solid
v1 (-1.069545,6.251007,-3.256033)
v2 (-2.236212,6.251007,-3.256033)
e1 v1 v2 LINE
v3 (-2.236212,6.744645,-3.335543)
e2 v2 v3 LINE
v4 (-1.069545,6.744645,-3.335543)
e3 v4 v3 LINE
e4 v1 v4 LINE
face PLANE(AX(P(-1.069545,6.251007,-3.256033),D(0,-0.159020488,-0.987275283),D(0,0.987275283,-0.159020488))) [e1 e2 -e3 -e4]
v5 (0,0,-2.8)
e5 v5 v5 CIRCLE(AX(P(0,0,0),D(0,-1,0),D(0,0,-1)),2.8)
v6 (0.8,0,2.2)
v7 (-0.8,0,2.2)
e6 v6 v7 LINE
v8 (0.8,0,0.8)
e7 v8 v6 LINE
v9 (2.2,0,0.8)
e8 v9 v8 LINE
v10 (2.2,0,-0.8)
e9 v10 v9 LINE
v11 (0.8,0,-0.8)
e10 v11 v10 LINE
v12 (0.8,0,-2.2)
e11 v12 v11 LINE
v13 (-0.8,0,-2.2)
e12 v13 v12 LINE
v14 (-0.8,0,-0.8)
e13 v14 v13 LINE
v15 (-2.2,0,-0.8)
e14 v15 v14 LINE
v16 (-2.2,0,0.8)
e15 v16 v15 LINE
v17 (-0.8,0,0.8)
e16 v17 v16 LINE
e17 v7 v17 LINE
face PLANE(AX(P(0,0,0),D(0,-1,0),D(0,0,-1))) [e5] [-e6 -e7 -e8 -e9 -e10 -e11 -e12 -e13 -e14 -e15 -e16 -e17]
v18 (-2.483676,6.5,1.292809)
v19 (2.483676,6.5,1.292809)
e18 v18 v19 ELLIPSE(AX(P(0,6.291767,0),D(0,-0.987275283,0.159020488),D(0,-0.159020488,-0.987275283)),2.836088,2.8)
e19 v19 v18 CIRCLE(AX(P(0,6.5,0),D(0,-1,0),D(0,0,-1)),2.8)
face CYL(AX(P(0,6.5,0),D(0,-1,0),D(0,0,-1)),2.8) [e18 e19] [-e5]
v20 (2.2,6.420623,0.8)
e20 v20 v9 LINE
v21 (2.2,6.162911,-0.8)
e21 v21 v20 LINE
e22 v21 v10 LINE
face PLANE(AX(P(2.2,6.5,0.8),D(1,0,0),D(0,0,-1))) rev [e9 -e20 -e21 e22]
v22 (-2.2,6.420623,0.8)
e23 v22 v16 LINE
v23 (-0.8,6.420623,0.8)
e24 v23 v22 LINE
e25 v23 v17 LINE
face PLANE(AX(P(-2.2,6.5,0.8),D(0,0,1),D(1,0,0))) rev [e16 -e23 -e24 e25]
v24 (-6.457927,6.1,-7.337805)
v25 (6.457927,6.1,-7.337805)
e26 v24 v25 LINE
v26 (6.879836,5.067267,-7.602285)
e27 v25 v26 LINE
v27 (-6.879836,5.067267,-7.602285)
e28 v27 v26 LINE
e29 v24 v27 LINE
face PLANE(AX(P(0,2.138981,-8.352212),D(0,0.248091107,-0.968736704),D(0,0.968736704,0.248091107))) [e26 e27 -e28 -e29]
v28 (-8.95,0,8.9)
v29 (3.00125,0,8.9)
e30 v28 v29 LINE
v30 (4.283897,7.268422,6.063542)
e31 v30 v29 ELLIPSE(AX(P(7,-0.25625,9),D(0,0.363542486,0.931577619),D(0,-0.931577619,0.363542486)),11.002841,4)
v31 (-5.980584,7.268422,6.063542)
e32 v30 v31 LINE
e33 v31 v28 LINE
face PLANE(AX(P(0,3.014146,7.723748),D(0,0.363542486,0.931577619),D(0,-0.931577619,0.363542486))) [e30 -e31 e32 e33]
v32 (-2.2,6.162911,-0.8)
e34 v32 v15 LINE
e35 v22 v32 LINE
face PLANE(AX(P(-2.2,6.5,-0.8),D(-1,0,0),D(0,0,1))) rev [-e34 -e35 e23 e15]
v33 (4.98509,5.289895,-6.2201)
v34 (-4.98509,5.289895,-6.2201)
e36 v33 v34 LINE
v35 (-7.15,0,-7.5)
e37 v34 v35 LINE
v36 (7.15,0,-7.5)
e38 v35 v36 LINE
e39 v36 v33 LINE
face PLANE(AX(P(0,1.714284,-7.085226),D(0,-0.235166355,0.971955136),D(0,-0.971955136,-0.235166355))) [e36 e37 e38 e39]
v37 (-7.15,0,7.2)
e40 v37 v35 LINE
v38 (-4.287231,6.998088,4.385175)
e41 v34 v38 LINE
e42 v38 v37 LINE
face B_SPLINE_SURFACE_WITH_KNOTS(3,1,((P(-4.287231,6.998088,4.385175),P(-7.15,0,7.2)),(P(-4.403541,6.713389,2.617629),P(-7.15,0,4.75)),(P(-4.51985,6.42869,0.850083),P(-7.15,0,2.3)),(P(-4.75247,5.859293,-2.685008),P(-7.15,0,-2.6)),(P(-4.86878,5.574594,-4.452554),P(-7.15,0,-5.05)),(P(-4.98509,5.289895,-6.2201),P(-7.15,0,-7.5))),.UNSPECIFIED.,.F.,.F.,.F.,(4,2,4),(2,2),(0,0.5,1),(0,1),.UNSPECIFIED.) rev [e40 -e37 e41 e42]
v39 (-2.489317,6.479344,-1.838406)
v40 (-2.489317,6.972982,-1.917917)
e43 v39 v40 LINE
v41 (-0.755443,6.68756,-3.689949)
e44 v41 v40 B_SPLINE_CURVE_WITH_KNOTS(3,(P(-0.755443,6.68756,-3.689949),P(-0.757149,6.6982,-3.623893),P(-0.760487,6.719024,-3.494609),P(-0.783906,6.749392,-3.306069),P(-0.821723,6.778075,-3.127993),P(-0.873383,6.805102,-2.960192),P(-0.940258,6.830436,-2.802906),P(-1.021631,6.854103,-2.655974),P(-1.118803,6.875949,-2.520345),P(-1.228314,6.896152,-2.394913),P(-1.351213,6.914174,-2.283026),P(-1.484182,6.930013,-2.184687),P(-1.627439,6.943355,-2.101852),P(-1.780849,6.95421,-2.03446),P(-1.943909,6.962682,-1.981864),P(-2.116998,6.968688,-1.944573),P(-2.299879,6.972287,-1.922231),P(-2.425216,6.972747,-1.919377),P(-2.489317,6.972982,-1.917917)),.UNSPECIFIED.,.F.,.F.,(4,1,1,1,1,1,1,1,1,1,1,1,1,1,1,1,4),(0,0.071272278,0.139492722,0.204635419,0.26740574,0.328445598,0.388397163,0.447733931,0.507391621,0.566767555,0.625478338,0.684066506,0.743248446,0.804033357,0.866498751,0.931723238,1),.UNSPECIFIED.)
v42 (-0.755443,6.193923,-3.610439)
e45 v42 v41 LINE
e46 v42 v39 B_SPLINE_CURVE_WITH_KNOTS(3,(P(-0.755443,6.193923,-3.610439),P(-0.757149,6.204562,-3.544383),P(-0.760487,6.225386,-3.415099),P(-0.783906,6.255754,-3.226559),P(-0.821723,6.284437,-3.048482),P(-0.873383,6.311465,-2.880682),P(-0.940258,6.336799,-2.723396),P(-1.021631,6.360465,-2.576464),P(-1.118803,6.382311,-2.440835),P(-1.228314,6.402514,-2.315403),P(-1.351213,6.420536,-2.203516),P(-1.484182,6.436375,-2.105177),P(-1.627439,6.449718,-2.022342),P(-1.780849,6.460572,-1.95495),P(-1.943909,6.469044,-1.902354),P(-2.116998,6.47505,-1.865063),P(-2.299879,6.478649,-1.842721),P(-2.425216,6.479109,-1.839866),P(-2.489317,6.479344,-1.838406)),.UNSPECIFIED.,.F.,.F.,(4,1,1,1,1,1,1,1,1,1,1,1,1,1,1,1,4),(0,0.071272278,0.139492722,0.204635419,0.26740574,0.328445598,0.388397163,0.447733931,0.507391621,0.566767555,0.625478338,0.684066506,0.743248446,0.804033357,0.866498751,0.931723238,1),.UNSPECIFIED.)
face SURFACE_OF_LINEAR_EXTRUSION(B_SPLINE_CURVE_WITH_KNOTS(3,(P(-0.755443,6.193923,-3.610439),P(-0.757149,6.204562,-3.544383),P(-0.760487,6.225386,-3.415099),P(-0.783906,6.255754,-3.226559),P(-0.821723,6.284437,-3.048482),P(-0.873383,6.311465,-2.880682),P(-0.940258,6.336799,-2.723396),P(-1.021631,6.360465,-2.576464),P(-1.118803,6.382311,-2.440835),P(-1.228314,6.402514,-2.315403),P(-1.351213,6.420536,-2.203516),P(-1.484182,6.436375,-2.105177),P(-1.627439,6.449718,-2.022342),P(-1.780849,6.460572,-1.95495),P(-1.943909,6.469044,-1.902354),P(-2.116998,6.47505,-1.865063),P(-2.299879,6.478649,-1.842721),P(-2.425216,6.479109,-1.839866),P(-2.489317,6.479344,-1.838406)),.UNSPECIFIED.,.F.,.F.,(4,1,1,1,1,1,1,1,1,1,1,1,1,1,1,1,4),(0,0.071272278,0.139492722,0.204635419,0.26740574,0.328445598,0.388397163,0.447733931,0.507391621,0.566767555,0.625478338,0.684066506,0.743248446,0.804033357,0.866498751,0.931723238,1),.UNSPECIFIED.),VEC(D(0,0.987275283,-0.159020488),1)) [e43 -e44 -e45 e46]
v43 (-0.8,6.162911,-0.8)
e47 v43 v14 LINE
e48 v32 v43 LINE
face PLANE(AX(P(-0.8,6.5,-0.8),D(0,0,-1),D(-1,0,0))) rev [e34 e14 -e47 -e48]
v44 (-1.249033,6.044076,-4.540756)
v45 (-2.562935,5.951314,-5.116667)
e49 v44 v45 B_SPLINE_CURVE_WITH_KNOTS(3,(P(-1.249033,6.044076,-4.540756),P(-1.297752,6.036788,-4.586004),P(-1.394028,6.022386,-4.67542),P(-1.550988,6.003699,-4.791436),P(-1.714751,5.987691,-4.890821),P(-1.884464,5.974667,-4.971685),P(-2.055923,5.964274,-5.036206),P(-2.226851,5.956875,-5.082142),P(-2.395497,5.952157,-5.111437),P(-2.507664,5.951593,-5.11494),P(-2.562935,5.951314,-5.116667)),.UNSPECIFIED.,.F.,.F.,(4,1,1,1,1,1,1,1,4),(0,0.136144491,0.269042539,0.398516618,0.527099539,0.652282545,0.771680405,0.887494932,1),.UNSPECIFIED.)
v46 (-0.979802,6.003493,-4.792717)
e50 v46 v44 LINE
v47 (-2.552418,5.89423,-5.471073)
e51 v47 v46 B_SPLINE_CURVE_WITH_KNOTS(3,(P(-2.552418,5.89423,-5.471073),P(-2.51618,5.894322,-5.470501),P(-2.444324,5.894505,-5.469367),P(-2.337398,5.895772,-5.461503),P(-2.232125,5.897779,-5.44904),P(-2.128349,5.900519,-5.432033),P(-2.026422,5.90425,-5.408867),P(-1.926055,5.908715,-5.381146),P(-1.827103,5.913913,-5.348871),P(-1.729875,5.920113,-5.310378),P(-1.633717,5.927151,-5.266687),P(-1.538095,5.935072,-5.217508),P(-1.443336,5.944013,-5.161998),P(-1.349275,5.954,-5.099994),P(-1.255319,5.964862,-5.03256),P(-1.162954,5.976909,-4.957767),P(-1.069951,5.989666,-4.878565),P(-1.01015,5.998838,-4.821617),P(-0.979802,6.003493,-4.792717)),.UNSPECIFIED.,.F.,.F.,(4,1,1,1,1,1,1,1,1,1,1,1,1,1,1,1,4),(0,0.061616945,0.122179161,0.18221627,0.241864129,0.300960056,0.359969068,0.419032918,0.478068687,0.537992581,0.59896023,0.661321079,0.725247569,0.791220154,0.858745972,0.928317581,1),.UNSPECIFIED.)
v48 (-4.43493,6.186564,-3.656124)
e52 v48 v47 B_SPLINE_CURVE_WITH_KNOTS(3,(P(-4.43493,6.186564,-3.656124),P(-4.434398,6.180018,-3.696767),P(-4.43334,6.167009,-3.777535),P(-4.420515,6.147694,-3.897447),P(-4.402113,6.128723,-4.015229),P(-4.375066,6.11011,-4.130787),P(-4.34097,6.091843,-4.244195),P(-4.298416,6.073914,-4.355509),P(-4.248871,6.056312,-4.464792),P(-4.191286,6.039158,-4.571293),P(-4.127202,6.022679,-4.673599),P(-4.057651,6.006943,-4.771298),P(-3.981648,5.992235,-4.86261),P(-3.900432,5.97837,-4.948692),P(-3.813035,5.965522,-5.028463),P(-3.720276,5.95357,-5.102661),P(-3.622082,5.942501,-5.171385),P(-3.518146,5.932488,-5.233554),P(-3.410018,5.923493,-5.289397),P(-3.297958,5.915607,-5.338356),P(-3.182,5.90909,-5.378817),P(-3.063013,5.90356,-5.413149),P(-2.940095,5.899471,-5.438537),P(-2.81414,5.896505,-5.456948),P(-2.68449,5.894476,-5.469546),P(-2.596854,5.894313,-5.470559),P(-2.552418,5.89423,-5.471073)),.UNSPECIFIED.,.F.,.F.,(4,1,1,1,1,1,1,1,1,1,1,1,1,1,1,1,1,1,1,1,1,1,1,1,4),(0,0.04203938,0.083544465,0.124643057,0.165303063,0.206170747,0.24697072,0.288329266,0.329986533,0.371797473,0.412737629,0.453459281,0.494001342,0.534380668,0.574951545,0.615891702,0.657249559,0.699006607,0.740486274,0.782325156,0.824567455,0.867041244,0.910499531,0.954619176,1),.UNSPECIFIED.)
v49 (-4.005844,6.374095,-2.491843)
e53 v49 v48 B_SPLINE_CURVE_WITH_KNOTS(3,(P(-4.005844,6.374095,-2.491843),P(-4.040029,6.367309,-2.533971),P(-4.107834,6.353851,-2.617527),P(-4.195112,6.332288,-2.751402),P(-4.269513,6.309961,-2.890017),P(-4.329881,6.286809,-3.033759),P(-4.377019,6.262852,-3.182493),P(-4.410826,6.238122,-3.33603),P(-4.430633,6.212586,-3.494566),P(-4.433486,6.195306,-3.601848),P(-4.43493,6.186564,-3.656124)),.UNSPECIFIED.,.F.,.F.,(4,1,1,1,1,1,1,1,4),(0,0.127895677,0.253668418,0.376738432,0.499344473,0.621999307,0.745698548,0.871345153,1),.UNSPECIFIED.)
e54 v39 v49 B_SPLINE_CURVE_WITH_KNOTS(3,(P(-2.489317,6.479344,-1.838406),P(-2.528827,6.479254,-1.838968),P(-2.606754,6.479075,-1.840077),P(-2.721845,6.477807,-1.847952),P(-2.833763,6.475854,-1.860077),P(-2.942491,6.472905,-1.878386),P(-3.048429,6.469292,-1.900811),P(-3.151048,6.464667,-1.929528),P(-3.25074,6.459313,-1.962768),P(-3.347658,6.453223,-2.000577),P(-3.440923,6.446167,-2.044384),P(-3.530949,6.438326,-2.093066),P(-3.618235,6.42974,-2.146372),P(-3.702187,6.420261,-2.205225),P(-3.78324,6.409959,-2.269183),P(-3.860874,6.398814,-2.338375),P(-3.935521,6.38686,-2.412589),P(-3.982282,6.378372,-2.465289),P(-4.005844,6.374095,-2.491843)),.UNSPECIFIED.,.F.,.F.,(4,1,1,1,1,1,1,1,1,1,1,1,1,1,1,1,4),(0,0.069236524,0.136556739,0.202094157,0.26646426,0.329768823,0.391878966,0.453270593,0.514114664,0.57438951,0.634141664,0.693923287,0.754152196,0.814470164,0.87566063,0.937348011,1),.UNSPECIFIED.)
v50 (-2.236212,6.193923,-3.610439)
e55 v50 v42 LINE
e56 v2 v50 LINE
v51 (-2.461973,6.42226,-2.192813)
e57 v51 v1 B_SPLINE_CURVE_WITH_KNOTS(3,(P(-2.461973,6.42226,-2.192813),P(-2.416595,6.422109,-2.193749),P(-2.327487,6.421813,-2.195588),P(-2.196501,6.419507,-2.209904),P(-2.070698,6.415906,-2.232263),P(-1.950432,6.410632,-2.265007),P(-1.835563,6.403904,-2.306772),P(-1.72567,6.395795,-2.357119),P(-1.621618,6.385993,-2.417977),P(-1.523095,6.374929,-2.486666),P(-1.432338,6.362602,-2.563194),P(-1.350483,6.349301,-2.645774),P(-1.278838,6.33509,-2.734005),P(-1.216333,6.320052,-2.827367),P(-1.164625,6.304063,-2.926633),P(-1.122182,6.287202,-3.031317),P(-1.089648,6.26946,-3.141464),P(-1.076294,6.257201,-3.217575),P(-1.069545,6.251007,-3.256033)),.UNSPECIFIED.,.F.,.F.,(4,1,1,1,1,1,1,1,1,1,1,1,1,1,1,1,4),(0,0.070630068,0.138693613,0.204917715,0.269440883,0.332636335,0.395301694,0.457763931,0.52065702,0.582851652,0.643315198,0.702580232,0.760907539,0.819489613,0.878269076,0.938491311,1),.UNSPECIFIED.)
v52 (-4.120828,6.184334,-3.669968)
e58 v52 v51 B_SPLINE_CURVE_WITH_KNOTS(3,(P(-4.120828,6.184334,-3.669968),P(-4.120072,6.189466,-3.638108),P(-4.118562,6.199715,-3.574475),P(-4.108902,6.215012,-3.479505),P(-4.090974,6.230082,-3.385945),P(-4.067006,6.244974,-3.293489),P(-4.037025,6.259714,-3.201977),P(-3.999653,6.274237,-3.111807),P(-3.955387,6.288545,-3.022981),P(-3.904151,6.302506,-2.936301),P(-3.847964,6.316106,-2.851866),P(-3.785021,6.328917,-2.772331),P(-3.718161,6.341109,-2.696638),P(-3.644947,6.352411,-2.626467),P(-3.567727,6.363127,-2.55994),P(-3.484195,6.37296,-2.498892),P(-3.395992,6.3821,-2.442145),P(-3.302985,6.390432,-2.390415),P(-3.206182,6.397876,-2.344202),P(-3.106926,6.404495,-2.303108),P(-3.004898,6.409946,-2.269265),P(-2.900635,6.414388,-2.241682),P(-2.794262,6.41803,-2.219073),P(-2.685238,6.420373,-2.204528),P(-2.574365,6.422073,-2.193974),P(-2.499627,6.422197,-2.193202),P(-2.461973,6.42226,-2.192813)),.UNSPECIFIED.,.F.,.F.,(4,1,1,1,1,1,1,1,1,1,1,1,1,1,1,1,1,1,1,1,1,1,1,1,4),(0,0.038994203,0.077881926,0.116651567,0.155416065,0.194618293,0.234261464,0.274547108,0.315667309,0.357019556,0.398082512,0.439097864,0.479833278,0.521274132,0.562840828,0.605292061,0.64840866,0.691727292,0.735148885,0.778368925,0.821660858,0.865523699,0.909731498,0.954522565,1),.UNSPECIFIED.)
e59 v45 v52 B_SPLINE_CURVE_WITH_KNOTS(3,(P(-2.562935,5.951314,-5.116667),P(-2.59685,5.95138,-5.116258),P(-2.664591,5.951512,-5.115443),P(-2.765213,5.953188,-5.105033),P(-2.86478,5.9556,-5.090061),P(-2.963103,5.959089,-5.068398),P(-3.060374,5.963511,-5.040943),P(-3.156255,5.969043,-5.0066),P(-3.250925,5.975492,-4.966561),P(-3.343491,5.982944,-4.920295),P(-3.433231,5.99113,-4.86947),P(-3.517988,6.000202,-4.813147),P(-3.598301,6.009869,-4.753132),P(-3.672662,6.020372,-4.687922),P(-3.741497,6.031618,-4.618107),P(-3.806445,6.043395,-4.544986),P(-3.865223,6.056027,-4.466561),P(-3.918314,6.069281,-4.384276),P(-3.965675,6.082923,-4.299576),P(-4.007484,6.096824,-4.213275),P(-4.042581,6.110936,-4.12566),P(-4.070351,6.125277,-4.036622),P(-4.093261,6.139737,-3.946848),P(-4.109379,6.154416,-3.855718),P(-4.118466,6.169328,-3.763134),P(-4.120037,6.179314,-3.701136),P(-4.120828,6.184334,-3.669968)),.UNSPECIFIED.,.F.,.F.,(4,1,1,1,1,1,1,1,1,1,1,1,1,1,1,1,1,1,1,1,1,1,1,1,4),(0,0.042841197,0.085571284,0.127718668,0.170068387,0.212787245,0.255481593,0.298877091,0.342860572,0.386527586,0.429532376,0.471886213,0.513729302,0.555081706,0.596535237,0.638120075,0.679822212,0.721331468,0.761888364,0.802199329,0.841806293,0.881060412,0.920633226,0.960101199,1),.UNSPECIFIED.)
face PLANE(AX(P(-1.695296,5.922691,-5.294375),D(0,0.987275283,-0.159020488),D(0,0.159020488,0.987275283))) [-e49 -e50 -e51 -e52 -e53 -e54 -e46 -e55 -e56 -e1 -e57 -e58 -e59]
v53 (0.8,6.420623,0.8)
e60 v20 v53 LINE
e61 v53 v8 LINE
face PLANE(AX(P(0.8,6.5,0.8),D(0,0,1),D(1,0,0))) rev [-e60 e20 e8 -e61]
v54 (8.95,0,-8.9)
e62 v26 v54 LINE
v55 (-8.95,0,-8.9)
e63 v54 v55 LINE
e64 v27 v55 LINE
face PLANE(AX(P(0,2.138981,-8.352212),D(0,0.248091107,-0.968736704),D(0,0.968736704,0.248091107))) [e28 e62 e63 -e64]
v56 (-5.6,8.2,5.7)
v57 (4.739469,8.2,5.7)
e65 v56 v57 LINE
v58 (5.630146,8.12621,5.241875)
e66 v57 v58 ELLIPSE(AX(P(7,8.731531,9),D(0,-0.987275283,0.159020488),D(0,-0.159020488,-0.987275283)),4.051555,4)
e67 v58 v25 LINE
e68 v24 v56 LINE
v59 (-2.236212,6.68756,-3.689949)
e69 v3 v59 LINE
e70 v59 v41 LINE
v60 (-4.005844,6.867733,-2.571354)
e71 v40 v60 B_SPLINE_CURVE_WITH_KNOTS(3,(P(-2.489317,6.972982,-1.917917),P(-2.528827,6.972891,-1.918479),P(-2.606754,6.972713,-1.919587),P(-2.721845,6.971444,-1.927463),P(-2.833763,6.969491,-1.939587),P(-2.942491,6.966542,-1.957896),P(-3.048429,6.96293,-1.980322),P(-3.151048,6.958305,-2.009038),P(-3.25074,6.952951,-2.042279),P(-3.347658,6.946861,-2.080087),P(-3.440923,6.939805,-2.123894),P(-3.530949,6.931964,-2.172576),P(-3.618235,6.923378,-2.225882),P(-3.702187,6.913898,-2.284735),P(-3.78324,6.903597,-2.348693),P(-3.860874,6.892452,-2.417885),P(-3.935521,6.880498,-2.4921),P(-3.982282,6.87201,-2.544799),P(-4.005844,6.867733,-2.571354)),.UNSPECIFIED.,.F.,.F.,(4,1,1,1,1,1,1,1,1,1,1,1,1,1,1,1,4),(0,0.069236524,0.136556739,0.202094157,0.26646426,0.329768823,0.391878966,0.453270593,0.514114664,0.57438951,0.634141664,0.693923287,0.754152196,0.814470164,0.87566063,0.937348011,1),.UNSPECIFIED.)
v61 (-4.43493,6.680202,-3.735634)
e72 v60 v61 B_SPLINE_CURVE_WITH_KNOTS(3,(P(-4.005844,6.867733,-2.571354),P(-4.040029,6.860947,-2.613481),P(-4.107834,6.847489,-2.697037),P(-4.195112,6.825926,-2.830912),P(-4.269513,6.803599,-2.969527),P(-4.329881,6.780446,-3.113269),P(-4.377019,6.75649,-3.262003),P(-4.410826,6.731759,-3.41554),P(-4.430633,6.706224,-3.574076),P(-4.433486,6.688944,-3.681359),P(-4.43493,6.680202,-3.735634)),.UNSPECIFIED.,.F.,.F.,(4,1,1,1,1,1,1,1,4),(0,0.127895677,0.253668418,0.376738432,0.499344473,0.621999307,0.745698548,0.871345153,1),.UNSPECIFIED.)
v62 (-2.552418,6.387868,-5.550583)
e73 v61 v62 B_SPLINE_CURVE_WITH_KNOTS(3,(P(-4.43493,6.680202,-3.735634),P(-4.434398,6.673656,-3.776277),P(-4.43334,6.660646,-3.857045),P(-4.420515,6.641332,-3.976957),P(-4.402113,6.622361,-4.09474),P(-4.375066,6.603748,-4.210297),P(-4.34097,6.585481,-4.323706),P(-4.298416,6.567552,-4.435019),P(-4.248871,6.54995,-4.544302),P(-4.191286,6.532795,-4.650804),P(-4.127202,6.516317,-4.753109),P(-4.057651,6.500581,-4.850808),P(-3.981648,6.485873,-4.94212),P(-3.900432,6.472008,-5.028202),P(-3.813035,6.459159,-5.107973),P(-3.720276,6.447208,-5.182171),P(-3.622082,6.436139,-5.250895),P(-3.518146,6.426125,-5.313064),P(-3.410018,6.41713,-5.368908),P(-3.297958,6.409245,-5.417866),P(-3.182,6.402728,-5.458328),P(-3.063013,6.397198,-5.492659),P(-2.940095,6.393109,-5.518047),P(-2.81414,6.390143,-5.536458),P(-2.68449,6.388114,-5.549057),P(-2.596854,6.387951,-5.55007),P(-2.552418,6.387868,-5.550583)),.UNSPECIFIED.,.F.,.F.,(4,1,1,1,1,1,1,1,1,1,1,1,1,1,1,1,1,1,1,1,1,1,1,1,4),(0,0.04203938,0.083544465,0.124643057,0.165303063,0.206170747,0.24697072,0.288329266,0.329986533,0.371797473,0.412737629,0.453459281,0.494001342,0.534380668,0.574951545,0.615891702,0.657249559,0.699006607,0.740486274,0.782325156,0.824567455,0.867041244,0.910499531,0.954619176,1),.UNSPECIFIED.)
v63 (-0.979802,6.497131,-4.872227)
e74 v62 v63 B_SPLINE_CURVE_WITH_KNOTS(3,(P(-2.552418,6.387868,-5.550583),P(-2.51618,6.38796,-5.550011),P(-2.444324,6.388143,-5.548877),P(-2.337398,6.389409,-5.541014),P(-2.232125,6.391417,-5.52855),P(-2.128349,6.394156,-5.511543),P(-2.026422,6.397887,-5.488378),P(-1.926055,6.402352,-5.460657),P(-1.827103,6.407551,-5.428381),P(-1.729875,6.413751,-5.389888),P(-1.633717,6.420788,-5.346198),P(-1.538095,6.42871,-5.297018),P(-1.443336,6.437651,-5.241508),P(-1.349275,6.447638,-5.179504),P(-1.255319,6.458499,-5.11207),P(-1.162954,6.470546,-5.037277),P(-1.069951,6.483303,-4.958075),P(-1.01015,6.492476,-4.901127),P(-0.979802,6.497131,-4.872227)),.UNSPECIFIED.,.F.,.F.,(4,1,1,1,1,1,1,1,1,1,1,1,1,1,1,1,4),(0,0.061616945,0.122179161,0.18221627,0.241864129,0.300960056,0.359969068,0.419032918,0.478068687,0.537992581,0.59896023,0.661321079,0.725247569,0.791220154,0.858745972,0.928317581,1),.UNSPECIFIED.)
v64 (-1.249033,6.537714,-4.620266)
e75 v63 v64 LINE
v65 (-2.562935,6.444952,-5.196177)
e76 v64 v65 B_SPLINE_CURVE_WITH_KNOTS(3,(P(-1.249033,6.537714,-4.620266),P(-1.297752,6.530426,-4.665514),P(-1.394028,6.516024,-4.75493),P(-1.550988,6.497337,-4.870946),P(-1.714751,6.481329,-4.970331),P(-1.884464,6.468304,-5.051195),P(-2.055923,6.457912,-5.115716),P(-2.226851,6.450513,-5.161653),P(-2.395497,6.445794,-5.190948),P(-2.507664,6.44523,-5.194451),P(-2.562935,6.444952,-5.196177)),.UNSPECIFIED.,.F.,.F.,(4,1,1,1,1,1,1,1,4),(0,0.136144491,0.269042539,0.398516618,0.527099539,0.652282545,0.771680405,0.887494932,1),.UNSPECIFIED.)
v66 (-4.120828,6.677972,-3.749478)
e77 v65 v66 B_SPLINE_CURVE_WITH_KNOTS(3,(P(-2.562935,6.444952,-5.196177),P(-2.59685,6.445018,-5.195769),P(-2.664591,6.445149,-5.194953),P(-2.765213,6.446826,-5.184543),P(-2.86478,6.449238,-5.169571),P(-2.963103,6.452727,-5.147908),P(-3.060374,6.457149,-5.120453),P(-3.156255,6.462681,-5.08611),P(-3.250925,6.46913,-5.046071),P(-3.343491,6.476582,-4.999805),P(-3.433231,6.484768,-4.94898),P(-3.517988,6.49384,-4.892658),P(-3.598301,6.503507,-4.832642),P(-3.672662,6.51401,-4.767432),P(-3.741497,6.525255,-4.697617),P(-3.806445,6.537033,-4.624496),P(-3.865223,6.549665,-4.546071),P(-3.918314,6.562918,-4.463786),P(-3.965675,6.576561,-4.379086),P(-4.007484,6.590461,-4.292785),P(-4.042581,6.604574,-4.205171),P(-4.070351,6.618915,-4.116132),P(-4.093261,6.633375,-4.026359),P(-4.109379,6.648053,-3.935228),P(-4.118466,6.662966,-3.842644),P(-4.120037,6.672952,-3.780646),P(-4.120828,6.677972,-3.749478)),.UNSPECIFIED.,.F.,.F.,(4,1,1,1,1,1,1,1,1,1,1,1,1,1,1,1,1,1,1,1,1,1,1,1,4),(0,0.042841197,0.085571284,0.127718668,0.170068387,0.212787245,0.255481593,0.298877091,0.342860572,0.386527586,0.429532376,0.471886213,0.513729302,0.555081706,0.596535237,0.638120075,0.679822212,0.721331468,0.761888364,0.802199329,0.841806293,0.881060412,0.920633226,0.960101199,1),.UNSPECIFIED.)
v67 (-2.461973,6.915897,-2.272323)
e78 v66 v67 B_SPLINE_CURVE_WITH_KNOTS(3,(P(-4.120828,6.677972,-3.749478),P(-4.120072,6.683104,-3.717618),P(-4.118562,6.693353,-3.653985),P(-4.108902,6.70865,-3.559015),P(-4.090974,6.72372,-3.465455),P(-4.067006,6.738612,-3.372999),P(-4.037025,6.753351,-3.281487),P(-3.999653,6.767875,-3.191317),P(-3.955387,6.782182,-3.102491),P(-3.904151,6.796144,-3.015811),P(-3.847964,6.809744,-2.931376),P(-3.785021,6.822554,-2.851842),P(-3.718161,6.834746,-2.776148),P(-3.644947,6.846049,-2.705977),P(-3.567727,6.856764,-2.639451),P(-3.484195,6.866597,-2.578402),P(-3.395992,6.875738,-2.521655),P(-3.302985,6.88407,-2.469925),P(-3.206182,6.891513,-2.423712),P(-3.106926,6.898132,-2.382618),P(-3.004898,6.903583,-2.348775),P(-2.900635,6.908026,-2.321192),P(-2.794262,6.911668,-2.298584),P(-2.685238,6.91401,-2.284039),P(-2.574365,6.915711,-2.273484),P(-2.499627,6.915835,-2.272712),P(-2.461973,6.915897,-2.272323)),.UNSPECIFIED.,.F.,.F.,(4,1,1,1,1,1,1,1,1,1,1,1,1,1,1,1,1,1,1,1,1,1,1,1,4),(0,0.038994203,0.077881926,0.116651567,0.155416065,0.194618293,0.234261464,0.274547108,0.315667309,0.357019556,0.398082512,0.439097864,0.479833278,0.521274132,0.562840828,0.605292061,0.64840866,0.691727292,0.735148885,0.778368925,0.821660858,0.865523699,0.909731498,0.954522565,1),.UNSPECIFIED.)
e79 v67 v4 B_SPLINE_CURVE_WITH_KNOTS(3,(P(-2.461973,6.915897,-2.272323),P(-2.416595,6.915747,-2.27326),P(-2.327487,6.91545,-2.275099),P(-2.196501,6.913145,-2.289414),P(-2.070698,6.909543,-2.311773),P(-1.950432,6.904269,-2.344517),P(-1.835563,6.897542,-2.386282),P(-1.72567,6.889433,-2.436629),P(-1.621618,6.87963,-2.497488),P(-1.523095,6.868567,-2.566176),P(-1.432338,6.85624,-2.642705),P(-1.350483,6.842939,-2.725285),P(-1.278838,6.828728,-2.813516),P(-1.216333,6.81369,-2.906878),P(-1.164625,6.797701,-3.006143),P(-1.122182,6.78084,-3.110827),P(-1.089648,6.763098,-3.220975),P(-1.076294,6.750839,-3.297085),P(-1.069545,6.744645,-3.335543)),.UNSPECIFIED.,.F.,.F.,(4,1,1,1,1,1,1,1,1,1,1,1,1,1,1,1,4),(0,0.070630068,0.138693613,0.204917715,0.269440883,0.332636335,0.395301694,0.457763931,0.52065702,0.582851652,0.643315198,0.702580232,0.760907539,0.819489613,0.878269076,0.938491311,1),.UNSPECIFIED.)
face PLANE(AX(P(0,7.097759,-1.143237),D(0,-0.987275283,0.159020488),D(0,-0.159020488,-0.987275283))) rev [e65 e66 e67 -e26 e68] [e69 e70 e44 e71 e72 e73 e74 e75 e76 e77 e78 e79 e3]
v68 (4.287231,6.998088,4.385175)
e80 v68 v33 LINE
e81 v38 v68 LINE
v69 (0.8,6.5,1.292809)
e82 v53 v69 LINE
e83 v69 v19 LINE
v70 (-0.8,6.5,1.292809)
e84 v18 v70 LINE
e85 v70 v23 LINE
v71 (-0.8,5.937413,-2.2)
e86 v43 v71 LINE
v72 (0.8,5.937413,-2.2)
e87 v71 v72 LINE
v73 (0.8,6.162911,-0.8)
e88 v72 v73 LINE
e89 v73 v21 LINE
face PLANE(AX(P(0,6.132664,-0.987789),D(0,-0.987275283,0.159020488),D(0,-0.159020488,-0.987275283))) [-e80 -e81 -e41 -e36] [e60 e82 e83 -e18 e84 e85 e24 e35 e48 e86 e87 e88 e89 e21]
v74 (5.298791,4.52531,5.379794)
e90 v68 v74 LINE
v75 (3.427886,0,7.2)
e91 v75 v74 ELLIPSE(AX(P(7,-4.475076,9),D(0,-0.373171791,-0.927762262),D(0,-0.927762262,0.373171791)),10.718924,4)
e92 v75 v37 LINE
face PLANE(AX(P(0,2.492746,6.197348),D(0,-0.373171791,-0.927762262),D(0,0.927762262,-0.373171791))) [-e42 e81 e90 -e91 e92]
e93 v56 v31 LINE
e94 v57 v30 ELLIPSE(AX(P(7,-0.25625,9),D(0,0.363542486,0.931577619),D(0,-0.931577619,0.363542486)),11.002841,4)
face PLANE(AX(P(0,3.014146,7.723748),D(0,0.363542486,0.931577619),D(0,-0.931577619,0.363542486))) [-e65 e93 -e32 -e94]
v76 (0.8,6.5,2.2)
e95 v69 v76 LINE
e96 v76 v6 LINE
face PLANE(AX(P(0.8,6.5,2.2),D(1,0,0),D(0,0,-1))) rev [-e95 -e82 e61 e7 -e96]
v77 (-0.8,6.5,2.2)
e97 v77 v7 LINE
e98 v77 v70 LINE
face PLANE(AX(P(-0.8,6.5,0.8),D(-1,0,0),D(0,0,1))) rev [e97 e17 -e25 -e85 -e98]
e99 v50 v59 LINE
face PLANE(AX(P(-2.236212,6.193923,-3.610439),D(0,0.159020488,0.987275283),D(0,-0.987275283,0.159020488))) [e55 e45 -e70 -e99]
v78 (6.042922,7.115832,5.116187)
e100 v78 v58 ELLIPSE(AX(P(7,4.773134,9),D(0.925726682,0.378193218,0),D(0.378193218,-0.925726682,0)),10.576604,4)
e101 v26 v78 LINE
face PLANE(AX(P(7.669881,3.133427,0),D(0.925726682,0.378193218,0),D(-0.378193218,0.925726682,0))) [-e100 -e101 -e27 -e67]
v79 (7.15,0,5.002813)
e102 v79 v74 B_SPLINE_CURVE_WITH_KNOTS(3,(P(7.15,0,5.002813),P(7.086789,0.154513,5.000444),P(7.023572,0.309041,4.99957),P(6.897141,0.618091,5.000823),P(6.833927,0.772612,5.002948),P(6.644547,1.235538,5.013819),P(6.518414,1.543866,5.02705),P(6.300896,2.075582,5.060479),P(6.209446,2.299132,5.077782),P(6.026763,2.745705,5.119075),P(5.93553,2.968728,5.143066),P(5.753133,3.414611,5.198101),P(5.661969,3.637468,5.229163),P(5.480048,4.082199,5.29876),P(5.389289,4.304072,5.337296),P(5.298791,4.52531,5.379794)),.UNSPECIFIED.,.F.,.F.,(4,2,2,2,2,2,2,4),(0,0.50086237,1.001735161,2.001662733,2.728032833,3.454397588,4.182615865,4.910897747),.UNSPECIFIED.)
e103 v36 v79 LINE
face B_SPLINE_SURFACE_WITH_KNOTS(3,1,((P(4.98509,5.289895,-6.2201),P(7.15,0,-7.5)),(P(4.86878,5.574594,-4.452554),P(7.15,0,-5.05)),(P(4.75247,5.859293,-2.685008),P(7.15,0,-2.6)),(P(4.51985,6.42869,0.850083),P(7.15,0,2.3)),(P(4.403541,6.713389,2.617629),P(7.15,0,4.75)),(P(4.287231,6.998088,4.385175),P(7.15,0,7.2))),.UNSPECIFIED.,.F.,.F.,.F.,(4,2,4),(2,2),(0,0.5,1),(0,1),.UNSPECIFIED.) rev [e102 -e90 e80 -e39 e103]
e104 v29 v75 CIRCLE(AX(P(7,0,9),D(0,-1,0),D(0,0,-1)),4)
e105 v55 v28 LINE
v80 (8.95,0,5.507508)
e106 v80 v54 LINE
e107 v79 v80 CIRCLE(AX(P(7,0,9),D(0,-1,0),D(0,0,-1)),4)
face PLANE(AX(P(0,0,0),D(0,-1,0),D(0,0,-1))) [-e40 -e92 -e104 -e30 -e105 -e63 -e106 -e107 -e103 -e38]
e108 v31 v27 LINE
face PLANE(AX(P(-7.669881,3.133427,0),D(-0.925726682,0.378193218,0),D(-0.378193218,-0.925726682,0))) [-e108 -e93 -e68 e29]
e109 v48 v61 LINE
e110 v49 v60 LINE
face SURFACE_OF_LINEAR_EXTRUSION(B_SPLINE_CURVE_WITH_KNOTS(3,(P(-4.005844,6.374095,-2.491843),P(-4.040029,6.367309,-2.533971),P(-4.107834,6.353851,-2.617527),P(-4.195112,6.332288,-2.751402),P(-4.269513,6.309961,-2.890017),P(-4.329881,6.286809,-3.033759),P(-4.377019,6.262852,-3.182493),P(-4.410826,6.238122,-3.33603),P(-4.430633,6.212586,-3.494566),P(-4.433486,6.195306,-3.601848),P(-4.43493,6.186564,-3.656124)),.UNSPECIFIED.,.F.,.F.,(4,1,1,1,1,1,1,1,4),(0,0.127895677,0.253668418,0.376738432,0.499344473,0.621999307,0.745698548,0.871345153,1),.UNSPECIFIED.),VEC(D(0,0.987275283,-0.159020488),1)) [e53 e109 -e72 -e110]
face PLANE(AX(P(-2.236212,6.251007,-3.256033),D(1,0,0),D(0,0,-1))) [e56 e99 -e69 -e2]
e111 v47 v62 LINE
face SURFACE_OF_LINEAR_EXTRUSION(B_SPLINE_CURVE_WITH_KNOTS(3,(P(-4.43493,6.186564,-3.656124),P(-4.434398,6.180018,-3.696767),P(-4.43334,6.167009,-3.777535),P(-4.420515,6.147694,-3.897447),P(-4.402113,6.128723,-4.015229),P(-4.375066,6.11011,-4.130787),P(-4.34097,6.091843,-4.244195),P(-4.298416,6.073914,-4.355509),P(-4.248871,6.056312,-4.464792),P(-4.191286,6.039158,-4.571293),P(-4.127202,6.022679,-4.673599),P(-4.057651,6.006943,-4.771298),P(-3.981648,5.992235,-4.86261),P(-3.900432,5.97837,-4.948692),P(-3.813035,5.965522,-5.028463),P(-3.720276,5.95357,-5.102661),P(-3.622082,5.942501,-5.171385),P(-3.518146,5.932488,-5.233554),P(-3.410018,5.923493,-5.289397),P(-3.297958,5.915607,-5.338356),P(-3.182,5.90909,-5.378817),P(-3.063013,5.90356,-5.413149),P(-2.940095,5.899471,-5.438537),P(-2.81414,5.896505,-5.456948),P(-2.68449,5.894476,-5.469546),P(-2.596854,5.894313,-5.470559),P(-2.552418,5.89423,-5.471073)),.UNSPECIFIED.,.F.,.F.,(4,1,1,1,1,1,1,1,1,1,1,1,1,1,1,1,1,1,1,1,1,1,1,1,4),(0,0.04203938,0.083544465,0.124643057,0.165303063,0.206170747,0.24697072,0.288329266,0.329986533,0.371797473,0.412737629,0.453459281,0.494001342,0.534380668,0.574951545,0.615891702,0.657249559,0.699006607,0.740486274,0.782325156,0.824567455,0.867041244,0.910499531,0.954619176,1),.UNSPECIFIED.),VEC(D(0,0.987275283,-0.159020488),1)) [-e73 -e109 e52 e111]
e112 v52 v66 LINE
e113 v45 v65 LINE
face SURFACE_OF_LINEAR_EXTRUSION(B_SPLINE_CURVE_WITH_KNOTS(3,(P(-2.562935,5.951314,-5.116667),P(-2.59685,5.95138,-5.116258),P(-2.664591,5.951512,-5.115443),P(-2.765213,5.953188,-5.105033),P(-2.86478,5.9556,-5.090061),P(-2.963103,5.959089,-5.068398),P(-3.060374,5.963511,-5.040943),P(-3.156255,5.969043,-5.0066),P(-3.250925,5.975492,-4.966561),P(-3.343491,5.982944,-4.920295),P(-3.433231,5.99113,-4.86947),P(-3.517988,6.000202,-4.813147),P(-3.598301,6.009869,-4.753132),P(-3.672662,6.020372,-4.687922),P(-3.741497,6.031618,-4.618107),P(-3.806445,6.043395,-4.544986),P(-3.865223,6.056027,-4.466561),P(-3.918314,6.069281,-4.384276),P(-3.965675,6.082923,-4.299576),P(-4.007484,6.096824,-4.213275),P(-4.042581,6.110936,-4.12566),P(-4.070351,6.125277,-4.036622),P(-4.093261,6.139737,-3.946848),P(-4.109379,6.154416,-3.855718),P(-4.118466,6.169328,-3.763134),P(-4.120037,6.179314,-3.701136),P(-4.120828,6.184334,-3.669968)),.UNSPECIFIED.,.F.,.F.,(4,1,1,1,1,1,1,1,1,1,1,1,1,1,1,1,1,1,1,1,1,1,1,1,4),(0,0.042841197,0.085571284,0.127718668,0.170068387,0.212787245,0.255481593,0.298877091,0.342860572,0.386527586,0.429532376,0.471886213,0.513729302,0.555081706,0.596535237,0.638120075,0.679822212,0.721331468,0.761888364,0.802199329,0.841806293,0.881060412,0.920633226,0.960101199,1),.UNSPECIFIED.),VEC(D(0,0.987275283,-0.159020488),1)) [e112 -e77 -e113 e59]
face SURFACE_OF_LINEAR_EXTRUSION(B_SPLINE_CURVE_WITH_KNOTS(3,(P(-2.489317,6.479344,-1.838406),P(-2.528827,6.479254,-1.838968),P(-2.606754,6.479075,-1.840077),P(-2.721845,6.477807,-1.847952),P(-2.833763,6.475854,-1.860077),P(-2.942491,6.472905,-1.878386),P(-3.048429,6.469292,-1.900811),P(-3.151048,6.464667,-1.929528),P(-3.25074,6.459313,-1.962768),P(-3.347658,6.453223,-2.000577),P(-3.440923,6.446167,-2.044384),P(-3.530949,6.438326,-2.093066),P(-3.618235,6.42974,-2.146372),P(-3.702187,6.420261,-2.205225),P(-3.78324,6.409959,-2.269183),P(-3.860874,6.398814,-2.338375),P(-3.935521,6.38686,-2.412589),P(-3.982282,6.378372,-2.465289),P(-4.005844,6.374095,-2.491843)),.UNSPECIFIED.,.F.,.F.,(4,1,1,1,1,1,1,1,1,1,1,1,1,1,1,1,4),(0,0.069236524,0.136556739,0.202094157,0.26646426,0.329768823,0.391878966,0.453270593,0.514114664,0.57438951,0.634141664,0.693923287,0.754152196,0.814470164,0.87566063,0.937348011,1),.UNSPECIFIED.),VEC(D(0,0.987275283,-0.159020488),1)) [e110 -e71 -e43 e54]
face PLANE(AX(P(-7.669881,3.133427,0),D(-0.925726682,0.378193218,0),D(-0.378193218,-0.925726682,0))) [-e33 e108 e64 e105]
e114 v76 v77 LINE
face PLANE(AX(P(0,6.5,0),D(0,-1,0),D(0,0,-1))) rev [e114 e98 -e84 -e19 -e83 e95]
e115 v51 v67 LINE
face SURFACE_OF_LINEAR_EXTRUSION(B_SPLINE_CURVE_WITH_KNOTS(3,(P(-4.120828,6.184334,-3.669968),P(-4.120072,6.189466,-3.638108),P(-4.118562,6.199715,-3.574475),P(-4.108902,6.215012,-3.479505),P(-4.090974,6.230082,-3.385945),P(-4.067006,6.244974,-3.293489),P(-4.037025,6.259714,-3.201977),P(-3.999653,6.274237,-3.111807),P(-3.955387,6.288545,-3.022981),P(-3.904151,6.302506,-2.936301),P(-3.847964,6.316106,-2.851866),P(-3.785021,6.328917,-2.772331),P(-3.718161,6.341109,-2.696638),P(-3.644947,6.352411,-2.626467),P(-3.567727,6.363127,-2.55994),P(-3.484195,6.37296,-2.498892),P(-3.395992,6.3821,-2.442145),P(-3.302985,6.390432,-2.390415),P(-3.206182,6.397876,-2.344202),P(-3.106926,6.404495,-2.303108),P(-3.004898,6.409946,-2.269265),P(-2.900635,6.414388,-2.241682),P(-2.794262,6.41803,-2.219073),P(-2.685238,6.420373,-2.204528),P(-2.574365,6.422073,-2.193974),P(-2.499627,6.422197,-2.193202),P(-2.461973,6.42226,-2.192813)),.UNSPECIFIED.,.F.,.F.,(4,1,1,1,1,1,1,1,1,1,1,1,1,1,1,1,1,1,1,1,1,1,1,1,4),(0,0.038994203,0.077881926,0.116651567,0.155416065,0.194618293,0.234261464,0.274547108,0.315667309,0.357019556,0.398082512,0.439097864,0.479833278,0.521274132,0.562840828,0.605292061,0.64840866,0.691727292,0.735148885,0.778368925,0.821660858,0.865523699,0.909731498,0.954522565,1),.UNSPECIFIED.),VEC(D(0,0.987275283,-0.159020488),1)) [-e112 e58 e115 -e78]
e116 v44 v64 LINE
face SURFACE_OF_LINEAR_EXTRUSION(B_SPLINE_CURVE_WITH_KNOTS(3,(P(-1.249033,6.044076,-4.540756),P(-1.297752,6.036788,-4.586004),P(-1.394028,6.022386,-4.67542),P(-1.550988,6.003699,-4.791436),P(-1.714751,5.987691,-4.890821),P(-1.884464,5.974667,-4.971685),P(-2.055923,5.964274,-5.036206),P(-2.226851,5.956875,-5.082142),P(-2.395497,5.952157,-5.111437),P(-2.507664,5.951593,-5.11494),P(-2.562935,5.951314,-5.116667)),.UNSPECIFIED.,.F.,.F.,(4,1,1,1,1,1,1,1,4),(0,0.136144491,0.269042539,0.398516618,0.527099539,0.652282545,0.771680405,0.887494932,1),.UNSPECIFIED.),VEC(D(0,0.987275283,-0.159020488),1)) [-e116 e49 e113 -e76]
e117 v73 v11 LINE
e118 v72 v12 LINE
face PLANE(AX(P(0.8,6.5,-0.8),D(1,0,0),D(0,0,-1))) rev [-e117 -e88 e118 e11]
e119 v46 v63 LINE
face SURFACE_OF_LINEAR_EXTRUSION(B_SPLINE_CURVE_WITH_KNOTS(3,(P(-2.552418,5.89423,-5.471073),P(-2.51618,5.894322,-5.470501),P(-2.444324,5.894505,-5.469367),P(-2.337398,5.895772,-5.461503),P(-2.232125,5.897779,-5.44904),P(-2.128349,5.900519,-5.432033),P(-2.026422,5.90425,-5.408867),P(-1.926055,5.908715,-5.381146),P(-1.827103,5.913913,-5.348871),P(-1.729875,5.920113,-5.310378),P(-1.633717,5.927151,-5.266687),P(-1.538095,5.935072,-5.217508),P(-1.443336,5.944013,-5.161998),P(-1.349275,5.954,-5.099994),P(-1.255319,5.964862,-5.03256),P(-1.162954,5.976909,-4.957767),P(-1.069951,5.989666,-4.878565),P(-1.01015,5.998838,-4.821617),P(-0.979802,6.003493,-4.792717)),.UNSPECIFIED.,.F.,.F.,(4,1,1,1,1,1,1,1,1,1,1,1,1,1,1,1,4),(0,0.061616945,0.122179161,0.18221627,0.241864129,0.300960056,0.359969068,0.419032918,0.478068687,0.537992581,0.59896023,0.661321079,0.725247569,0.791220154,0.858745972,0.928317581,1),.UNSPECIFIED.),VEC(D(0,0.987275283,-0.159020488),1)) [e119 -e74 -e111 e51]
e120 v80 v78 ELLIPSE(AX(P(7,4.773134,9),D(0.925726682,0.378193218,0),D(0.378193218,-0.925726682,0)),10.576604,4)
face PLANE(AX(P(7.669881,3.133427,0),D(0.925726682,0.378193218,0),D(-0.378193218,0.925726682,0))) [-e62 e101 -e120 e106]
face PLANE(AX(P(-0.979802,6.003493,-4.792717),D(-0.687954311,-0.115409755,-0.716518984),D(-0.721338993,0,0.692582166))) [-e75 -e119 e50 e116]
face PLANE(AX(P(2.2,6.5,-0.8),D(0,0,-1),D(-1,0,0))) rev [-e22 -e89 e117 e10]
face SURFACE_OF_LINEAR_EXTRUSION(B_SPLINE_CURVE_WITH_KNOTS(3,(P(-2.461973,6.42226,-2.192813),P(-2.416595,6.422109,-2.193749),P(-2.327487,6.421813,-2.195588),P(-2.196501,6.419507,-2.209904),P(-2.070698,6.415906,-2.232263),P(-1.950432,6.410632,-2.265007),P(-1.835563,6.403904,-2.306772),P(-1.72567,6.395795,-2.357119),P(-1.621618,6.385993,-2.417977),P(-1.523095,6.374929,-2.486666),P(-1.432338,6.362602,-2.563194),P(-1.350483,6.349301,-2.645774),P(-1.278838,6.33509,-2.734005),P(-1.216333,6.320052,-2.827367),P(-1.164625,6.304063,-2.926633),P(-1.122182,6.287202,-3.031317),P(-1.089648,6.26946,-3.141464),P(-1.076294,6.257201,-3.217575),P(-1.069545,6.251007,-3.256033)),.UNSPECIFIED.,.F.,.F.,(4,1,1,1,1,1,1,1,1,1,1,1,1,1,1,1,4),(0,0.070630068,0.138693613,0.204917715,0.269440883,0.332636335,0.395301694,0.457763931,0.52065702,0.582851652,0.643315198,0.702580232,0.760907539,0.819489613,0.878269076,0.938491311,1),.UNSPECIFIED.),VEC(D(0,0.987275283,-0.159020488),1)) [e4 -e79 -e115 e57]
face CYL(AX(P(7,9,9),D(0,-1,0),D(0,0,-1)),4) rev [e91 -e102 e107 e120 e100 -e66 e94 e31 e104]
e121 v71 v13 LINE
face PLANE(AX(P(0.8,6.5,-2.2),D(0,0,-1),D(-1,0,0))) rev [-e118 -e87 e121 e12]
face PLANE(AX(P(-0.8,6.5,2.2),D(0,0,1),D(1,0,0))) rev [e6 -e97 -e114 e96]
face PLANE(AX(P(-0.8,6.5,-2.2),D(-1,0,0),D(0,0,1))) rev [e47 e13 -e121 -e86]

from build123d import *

# Parameters (mm, degrees)
OTHER_START         = 7.189240539
OTHER_2_OUTLINE_W   = 16
OTHER_2_OUTLINE_H   = 16
OTHER_2_DEPTH       = 1.9877561
SKETCH_20_R         = 2.8
EXTRUDE_2_DEPTH     = 6.5
SKETCH_22_R         = 4
CUT_EXTRUDE_2_DEPTH = 9
CUT_EXTRUDE_3_DEPTH = 0.5


# Read off the part's stored shape, not the designer's step: 相交2
with BuildPart() as part:
    # 草图4 → Loft 1 section 0
    with BuildSketch(Plane(origin=(0, 8.2, 0), x_dir=(1, 0, 0), z_dir=(0, 1, 0))):
        with BuildLine():
            Line((-5.6, 6.8), (5.6, 6.8))
            Line((5.6, 6.8), (5.6, -5.7))
            Line((5.6, -5.7), (-5.6, -5.7))
            Line((-5.6, -5.7), (-5.6, 6.8))
        make_face()
    # 草图1 → Loft 1 section 1
    with BuildSketch(Plane(origin=(0, 0, 0), x_dir=(1, 0, 0), z_dir=(0, 1, 0))):
        with BuildLine():
            Line((-8.95, -8.9), (8.95, -8.9))
            Line((8.95, -8.9), (8.95, 8.9))
            Line((8.95, 8.9), (-8.95, 8.9))
            Line((-8.95, 8.9), (-8.95, -8.9))
        make_face()
    loft()

    # 相交2 outline → 相交2 (cut)
    with BuildSketch(Plane(origin=(0, 0, 0), x_dir=(1, 0, 0), z_dir=(0, 0.9872752829851917, -0.15902048800865198)).offset(OTHER_START)):
        Rectangle(OTHER_2_OUTLINE_W, OTHER_2_OUTLINE_H)
    extrude(amount=OTHER_2_DEPTH, mode=Mode.SUBTRACT)

    # 草图19 → Loft 1 2 section 0
    with BuildSketch(Plane(origin=(0, 6.132664073, -0.987788564), x_dir=(1, 0, 0), z_dir=(0, 0.9872752829851916, -0.15902048800865207))):
        with BuildLine():
            Line((-4.985089723, 5.299749211), (4.985089723, 5.299749211))
            Line((4.985089723, 5.299749211), (4.287230721, -5.442213697))
            Line((4.287230721, -5.442213697), (-4.287230721, -5.442213697))
            Line((-4.287230721, -5.442213697), (-4.985089723, 5.299749211))
        make_face()
    # 草图8 → Loft 1 2 section 1
    with BuildSketch(Plane.XZ):
        with BuildLine():
            Line((-7.15, 7.2), (7.15, 7.2))
            Line((7.15, 7.2), (7.15, -7.5))
            Line((7.15, -7.5), (-7.15, -7.5))
            Line((-7.15, -7.5), (-7.15, 7.2))
        make_face()
    loft(mode=Mode.SUBTRACT)

    # 草图20 → 凸台-拉伸2 (add)
    with BuildSketch(Plane.XZ):
        with Locations(Location((0, 0, 0), (0, 0, 270))):
            Circle(SKETCH_20_R)
        Polygon((-2.2, 0.8), (-0.8, 0.8), (-0.8, 2.2), (0.8, 2.2), (0.8, 0.8), (2.2, 0.8), (2.2, -0.8), (0.8, -0.8), (0.8, -2.2), (-0.8, -2.2), (-0.8, -0.8), (-2.2, -0.8), align=None, mode=Mode.SUBTRACT)
    extrude(amount=-EXTRUDE_2_DEPTH)

    # 草图22 → 切除-拉伸2 (cut)
    with BuildSketch(Plane.XZ):
        with Locations((7, 9)):
            Circle(SKETCH_22_R)
    extrude(amount=-CUT_EXTRUDE_2_DEPTH, mode=Mode.SUBTRACT)

    # 草图23 → 切除-拉伸3 (cut)
    with BuildSketch(Plane(origin=(0, 7.097759487, -1.143236539), x_dir=(1, 0, 0), z_dir=(0, 0.9872752829851916, -0.15902048800865207))):
        with BuildLine():
            Line((-0.979801877, 3.777052641), (-1.249032646, 3.521844308))
            add(Edge.make_bspline(
                [(-1.249032646, 3.521844308), (-1.297751534, 3.567675171), (-1.39402758, 3.658244034), (-1.550987823, 3.775755029), (-1.714751457, 3.876421129), (-1.884463954, 3.958327366), (-2.055922508, 4.023680126), (-2.226851284, 4.070208266), (-2.395496985, 4.099880804), (-2.507664204, 4.103429173), (-2.562934889, 4.105177641)],
                knots=[0, 0, 0, 0, 1.08915593, 2.152340314, 3.188132944, 4.216796309, 5.218260357, 6.173443236, 7.099959455, 8, 8, 8, 8], degree=3))
            add(Edge.make_bspline(
                [(-2.562934889, 4.105177641), (-2.596849589, 4.104764035), (-2.66459103, 4.103937896), (-2.765212974, 4.093393681), (-2.864779611, 4.078228817), (-2.963102986, 4.056286939), (-3.060374272, 4.02847788), (-3.156255164, 3.993692417), (-3.250924519, 3.953137172), (-3.3434906, 3.906274699), (-3.433231104, 3.854794852), (-3.517987939, 3.797746312), (-3.598301338, 3.736957522), (-3.672661763, 3.670906542), (-3.74149695, 3.600191677), (-3.806445322, 3.526128371), (-3.865222618, 3.446693152), (-3.918313783, 3.363347526), (-3.965675401, 3.277555337), (-4.007484055, 3.190142347), (-4.042581143, 3.101398493), (-4.070350598, 3.011212415), (-4.093261252, 2.920281825), (-4.109378859, 2.827977105), (-4.118465582, 2.73419942), (-4.120037361, 2.671402161), (-4.120827518, 2.63983309)],
                knots=[0, 0, 0, 0, 1.02818874, 2.053710826, 3.065248034, 4.081641283, 5.106893873, 6.131558223, 7.173050175, 8.228653731, 9.27666206, 10.308777013, 11.325269123, 12.329503258, 13.32196095, 14.316845687, 15.314881793, 16.315733098, 17.311955233, 18.285320748, 19.252783886, 20.203351036, 21.145449891, 22.095197417, 23.042428769, 24, 24, 24, 24], degree=3))
            add(Edge.make_bspline(
                [(-4.120827518, 2.63983309), (-4.120071799, 2.607562273), (-4.118562426, 2.543108759), (-4.108902107, 2.446914687), (-4.090973866, 2.352149284), (-4.067006157, 2.258501151), (-4.037025342, 2.165809903), (-3.999652676, 2.074477393), (-3.955387075, 1.984507002), (-3.904150523, 1.896709385), (-3.84796432, 1.811186362), (-3.785021239, 1.73062684), (-3.718160655, 1.653958063), (-3.644946755, 1.582882299), (-3.567727213, 1.515498403), (-3.484194937, 1.453662881), (-3.395992477, 1.396184658), (-3.302985265, 1.343788138), (-3.206182482, 1.296979603), (-3.106925729, 1.255355706), (-3.004897914, 1.221076369), (-2.900635224, 1.193138265), (-2.794261952, 1.170237968), (-2.68523815, 1.155505488), (-2.574365441, 1.144814657), (-2.499626809, 1.144032987), (-2.461973351, 1.14363918)],
                knots=[0, 0, 0, 0, 0.93586088, 1.869166235, 2.799637598, 3.729985548, 4.670839027, 5.622275134, 6.589130586, 7.576015415, 8.568469353, 9.55398029, 10.53834874, 11.515998671, 12.510579167, 13.508179873, 14.527009472, 15.561807829, 16.601455013, 17.643573243, 18.680854198, 19.719860599, 20.772568776, 21.833555941, 22.908541556, 24, 24, 24, 24], degree=3))
            add(Edge.make_bspline(
                [(-2.461973351, 1.14363918), (-2.416595004, 1.144587756), (-2.327487246, 1.14645044), (-2.196500804, 1.160950729), (-2.070697733, 1.183597523), (-1.95043153, 1.21676342), (-1.835562509, 1.259067095), (-1.725669568, 1.310062481), (-1.621617909, 1.37170554), (-1.523094735, 1.441279407), (-1.43233755, 1.51879424), (-1.350483426, 1.602438695), (-1.278837937, 1.691806762), (-1.216333237, 1.786372077), (-1.164624583, 1.886917382), (-1.122181788, 1.992949944), (-1.089648496, 2.104517456), (-1.076293522, 2.181609088), (-1.069545466, 2.220562257)],
                knots=[0, 0, 0, 0, 1.13008108, 2.219097802, 3.278683437, 4.311054135, 5.322181354, 6.324827112, 7.324222904, 8.330512327, 9.32562643, 10.293043162, 11.24128371, 12.174520618, 13.111833804, 14.052305215, 15.015860969, 16, 16, 16, 16], degree=3))
            Line((-1.069545466, 2.220562257), (-2.236212133, 2.220562257))
            Line((-2.236212133, 2.220562257), (-2.236212133, 2.579536616))
            Line((-2.236212133, 2.579536616), (-0.755442902, 2.579536616))
            add(Edge.make_bspline(
                [(-0.755442902, 2.579536616), (-0.757148751, 2.512629127), (-0.760487404, 2.381679085), (-0.78390632, 2.190708814), (-0.821722832, 2.010337121), (-0.873383144, 1.840374049), (-0.940258424, 1.681060457), (-1.021630952, 1.53223459), (-1.118803074, 1.39485791), (-1.228313515, 1.267808906), (-1.351213473, 1.154479694), (-1.484182093, 1.054873756), (-1.627439061, 0.970971141), (-1.780848869, 0.902710478), (-1.943909302, 0.849436483), (-2.116997682, 0.811664907), (-2.299879283, 0.789034943), (-2.425215959, 0.786143564), (-2.489317101, 0.784664821)],
                knots=[0, 0, 0, 0, 1.140356446, 2.231883559, 3.274166699, 4.278491846, 5.25512956, 6.21435461, 7.1637429, 8.11826594, 9.068280886, 10.0076534, 10.945064095, 11.891975133, 12.864533718, 13.863980011, 14.907571808, 16, 16, 16, 16], degree=3))
            add(Edge.make_bspline(
                [(-2.489317101, 0.784664821), (-2.528827236, 0.785233942), (-2.606753957, 0.786356433), (-2.721844885, 0.79433378), (-2.833762506, 0.806614356), (-2.942490515, 0.82515948), (-3.048428857, 0.847874134), (-3.151048442, 0.876960853), (-3.250740184, 0.910629552), (-3.347658169, 0.948925226), (-3.440922716, 0.993296882), (-3.530949233, 1.042606522), (-3.618235359, 1.096599882), (-3.702186524, 1.156210728), (-3.783240145, 1.220993188), (-3.860873589, 1.291077107), (-3.935521467, 1.366248227), (-3.982281931, 1.419627237), (-4.005843543, 1.446523795)],
                knots=[0, 0, 0, 0, 1.107784379, 2.184907829, 3.233506516, 4.263428166, 5.276301166, 6.270063455, 7.25232949, 8.225834625, 9.190232166, 10.146266622, 11.1027726, 12.066435141, 13.031522626, 14.010570082, 14.99756817, 16, 16, 16, 16], degree=3))
            add(Edge.make_bspline(
                [(-4.005843543, 1.446523795), (-4.040029475, 1.489194448), (-4.107833888, 1.573827465), (-4.195112044, 1.70942741), (-4.269513447, 1.84982927), (-4.329881269, 1.995423898), (-4.377019356, 2.146075111), (-4.410825608, 2.301590402), (-4.430632898, 2.462170033), (-4.433486435, 2.570835298), (-4.434930082, 2.625810654)],
                knots=[0, 0, 0, 0, 1.023165419, 2.029347347, 3.013907458, 3.994755782, 4.975994455, 5.96558838, 6.970761222, 8, 8, 8, 8], degree=3))
            add(Edge.make_bspline(
                [(-4.434930082, 2.625810654), (-4.434397844, 2.666976907), (-4.433340132, 2.748786214), (-4.420514615, 2.870243522), (-4.402113197, 2.989544214), (-4.375066143, 3.10659077), (-4.340969878, 3.221461362), (-4.298416392, 3.334209326), (-4.248871496, 3.444901197), (-4.191286, 3.552775065), (-4.127201541, 3.656399478), (-4.05765132, 3.755357282), (-3.98164772, 3.847846347), (-3.90043192, 3.935037995), (-3.81303493, 4.015836842), (-3.720275507, 4.090990953), (-3.622082164, 4.160601138), (-3.518145984, 4.223570973), (-3.410018299, 4.280134594), (-3.297958298, 4.329723805), (-3.182000187, 4.370707121), (-3.063012709, 4.4054809), (-2.940095209, 4.431196041), (-2.814139672, 4.449844786), (-2.68448956, 4.462605386), (-2.59685353, 4.463631642), (-2.552418062, 4.464152)],
                knots=[0, 0, 0, 0, 1.008945113, 2.00506715, 2.99143336, 3.967273523, 4.948097931, 5.927297278, 6.919902385, 7.919676788, 8.923139349, 9.905703106, 10.883022732, 11.856032218, 12.825136022, 13.798837087, 14.781400844, 15.773989409, 16.776158564, 17.77167057, 18.775803737, 19.789618931, 20.80898985, 21.851988756, 22.910860228, 24, 24, 24, 24], degree=3))
            add(Edge.make_bspline(
                [(-2.552418062, 4.464152), (-2.516179819, 4.463572509), (-2.44432364, 4.462423445), (-2.337397908, 4.454458797), (-2.232124893, 4.441834915), (-2.128348503, 4.424608129), (-2.026422137, 4.401144438), (-1.926055432, 4.373066154), (-1.827102895, 4.340374331), (-1.729874646, 4.301385485), (-1.63371693, 4.25713186), (-1.53809509, 4.207318437), (-1.443335844, 4.151093433), (-1.349274862, 4.088289897), (-1.255319004, 4.019986479), (-1.162954362, 3.944229656), (-1.069951418, 3.8640069), (-1.010149603, 3.806324716), (-0.979801877, 3.777052641)],
                knots=[0, 0, 0, 0, 0.985871117, 1.954866573, 2.915460327, 3.869826059, 4.81536089, 5.759505086, 6.70452669, 7.649098992, 8.607881297, 9.583363685, 10.581137262, 11.603961102, 12.659522466, 13.73993555, 14.853081303, 16, 16, 16, 16], degree=3))
        make_face()
    extrude(amount=-CUT_EXTRUDE_3_DEPTH, mode=Mode.SUBTRACT)


solid = part.part
